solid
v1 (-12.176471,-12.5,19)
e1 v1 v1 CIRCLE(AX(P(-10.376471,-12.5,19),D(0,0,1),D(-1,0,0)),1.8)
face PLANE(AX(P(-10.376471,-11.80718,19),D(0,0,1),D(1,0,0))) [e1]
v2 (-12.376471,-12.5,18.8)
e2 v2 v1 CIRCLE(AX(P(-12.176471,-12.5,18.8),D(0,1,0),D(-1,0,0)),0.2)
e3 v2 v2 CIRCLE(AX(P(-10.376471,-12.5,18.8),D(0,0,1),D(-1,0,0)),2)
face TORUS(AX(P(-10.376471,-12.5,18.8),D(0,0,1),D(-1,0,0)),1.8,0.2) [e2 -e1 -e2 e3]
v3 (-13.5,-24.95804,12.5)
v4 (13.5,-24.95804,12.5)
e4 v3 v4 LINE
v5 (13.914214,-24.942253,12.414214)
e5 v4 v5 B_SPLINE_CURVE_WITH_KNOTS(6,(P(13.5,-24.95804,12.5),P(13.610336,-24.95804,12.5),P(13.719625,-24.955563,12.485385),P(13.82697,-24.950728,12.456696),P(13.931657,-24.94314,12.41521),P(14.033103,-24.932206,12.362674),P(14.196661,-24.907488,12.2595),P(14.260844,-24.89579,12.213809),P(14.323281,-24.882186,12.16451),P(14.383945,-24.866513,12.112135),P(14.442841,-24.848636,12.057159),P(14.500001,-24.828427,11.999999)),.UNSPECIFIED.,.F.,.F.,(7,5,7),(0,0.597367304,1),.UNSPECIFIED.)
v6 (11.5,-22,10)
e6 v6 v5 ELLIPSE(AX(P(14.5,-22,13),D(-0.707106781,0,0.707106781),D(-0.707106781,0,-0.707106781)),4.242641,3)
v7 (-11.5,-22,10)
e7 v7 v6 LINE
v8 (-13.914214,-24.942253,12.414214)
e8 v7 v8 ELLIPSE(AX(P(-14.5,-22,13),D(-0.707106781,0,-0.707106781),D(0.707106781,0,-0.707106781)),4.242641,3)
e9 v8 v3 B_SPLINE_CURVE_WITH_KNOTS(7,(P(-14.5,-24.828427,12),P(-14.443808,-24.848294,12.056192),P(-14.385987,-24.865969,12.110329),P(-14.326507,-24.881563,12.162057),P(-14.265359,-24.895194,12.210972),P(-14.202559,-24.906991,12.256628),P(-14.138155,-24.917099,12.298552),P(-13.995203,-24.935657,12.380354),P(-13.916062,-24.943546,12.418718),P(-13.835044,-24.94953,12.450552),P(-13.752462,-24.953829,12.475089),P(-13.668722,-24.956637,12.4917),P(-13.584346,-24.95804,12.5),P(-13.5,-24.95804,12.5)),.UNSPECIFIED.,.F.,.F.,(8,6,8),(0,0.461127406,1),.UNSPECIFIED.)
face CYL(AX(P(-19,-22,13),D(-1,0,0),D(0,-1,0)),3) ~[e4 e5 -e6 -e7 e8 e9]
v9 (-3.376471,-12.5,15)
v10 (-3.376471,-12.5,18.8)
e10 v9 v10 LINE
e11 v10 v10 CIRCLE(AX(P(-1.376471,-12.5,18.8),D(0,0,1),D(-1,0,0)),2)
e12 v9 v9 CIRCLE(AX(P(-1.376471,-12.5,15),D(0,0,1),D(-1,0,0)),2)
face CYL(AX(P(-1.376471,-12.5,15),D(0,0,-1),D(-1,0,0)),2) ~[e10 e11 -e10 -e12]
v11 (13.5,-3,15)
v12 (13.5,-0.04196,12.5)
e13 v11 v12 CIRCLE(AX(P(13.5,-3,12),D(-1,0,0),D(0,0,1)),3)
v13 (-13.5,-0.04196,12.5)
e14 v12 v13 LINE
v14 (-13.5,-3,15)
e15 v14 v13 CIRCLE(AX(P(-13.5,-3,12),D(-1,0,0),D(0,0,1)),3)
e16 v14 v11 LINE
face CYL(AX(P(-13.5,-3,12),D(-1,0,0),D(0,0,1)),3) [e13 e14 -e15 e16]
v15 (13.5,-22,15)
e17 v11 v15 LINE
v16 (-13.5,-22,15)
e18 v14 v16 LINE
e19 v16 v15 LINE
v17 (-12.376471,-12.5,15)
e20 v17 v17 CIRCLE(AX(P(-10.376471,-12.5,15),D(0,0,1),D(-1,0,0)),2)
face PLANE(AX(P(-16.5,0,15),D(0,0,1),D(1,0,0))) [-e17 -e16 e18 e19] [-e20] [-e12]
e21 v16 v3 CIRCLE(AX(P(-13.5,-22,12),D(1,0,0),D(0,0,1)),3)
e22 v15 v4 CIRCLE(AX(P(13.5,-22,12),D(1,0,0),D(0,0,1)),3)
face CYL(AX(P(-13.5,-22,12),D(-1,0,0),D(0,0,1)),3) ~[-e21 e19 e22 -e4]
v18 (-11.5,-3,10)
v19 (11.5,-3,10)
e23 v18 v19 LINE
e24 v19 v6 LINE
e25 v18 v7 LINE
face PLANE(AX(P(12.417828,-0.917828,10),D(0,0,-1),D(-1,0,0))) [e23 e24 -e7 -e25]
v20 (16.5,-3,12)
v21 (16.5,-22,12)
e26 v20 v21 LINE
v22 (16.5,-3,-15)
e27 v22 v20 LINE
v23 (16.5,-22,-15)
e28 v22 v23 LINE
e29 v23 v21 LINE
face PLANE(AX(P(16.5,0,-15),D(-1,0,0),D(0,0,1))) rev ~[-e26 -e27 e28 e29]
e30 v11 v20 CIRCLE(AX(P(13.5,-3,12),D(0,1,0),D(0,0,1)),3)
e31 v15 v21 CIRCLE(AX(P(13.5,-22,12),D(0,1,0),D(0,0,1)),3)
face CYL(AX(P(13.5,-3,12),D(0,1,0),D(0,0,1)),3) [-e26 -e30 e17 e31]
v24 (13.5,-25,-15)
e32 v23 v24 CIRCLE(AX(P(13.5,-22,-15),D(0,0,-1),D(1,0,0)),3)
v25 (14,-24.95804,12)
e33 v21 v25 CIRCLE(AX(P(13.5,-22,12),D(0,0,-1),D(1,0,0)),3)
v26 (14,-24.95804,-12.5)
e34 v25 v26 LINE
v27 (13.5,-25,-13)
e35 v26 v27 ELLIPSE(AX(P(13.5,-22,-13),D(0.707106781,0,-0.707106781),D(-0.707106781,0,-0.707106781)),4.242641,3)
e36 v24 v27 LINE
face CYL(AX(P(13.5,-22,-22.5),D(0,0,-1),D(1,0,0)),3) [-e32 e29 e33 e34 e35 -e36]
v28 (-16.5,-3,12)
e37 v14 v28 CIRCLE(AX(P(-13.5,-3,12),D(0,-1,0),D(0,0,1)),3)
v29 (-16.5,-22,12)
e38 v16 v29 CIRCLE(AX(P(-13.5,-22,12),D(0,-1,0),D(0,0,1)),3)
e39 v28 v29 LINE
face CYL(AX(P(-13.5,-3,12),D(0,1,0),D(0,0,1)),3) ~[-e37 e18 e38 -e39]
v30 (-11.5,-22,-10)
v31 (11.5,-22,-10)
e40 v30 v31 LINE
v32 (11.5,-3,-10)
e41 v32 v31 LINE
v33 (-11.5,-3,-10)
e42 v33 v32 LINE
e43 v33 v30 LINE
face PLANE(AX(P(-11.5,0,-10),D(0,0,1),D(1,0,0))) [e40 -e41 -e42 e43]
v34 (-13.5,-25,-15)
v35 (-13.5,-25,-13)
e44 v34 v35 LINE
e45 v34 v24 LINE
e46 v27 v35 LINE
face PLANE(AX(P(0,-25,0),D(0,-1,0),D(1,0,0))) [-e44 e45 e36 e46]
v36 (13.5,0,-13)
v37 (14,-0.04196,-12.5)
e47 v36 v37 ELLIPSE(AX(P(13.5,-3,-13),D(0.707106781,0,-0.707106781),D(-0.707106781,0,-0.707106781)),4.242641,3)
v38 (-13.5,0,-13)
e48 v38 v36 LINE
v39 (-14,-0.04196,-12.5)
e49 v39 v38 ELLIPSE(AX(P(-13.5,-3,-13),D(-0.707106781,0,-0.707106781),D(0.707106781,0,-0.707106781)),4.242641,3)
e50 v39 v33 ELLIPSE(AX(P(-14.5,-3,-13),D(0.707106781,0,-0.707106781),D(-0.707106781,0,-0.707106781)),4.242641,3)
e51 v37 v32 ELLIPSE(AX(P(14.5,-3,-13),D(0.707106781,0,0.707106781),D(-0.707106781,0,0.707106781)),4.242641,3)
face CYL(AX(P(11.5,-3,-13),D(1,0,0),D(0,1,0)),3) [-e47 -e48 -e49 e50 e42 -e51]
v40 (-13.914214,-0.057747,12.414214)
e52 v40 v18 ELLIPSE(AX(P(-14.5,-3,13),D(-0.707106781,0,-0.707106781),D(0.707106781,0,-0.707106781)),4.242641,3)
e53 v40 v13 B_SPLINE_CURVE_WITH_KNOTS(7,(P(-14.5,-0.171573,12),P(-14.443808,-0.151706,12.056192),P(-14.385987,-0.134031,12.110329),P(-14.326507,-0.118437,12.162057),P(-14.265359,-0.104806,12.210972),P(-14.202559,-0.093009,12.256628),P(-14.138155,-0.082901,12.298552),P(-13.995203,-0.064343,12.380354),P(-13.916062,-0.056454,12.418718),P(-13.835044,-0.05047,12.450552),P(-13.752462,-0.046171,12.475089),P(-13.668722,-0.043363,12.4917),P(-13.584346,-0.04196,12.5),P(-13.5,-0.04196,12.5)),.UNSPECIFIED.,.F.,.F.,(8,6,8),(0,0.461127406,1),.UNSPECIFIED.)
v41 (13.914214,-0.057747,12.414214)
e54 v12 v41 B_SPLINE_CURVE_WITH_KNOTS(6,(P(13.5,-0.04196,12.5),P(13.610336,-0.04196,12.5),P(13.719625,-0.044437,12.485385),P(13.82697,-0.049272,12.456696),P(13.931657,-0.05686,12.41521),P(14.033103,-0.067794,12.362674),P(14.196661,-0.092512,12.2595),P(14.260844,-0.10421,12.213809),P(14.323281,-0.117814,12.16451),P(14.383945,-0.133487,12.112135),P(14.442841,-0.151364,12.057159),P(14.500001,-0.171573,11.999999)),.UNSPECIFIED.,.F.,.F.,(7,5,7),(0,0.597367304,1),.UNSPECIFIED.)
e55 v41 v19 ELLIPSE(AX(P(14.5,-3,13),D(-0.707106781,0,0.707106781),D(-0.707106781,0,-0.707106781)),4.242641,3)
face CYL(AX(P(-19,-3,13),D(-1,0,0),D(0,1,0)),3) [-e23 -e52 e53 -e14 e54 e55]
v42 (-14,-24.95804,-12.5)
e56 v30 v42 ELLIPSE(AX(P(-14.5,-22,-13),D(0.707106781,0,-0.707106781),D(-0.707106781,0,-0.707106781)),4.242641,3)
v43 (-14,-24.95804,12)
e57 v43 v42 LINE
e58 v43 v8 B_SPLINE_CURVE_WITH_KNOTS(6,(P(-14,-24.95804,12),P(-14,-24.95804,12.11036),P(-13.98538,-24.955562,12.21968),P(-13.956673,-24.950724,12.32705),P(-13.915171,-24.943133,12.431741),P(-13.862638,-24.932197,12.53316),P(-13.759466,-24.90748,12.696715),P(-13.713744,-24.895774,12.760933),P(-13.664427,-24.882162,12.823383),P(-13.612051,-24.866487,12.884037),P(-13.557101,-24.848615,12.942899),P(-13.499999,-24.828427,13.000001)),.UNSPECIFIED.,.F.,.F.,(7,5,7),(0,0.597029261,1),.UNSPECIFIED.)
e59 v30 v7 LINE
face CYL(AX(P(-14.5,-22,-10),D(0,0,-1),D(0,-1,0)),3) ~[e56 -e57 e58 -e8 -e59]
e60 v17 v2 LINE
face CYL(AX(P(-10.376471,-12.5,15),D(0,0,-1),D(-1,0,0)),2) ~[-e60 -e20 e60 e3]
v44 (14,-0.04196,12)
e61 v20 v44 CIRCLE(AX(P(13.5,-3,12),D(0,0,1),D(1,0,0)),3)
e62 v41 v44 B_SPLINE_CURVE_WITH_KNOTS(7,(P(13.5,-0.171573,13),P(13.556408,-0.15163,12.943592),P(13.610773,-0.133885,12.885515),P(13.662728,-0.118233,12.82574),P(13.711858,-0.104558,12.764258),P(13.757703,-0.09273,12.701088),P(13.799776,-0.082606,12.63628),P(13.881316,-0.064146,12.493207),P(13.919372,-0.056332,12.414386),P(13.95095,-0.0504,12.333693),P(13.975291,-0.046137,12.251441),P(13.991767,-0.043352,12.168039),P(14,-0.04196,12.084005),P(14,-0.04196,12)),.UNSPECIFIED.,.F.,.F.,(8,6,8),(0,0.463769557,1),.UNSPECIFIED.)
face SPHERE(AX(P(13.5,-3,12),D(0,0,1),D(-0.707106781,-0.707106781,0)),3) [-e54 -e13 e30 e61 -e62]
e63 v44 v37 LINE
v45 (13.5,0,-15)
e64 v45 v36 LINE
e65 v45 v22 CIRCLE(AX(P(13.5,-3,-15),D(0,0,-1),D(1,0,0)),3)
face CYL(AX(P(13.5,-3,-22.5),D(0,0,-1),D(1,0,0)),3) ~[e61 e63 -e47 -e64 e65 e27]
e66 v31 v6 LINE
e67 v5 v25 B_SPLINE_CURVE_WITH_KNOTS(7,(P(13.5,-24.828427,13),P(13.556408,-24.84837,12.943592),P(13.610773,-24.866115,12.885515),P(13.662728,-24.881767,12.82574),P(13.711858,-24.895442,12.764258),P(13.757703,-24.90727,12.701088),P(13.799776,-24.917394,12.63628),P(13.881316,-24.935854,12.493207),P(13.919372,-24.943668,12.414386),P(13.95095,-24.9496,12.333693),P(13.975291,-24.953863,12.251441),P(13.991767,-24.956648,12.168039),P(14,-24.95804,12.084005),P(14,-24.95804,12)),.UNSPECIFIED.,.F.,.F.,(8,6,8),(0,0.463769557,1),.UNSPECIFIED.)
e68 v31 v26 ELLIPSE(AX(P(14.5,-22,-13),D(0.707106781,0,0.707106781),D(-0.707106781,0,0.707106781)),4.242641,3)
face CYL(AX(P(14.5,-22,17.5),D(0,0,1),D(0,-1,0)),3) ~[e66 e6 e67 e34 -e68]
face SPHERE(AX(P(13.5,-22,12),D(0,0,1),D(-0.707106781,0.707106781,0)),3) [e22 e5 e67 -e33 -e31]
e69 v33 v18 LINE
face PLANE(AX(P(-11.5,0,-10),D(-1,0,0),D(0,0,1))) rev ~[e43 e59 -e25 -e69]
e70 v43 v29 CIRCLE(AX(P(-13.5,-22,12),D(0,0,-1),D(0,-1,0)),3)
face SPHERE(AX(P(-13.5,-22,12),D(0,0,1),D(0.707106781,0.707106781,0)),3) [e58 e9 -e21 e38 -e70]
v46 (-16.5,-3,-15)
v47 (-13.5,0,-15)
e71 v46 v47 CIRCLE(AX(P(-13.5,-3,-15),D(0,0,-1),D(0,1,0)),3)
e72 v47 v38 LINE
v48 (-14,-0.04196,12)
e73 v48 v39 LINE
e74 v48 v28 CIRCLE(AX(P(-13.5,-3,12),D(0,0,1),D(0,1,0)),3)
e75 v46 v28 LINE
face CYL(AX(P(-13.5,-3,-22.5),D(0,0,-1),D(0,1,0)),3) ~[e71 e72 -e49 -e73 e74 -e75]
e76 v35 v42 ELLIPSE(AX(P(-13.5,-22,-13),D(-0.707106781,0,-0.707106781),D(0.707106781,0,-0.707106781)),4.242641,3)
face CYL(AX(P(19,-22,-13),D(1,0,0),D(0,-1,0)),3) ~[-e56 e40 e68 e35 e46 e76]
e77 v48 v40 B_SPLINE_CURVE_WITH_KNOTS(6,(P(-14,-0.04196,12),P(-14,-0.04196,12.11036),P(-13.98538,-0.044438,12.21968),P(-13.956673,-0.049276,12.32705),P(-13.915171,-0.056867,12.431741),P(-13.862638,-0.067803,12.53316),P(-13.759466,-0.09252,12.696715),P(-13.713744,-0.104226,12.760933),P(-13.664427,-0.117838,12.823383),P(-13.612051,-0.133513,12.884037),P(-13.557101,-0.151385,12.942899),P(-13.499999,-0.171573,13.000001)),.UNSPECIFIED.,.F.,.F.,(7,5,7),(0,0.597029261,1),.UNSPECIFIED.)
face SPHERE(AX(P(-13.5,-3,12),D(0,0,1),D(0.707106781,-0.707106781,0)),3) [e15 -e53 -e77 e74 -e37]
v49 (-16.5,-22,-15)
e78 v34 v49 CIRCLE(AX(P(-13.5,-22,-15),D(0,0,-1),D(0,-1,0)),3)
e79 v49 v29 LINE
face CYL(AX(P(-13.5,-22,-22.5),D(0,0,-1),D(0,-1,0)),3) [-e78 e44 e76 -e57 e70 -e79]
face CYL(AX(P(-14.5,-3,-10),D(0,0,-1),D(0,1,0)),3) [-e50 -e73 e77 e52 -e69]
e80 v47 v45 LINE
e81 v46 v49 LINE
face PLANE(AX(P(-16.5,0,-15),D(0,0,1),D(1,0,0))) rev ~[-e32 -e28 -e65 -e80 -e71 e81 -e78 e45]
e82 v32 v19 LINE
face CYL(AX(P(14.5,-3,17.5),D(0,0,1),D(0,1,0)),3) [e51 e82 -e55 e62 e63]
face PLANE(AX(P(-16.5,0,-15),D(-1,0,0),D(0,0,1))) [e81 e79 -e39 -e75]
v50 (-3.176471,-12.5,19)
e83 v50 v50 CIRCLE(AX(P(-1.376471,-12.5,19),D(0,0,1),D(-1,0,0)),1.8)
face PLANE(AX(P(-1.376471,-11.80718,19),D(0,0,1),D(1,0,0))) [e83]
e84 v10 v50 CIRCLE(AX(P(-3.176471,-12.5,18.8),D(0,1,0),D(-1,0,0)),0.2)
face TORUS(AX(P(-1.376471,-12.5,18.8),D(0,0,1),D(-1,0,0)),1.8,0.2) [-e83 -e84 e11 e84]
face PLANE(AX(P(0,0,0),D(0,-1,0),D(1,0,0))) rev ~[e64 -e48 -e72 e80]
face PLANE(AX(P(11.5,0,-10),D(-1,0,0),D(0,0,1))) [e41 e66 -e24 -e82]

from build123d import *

# Parameters (mm, degrees)
F0_W          = 33
F0_H          = 30
F0_W_2        = 23
F0_H_2        = 20
F1_DEPTH      = 25
F3_DEPTH      = 4
F4_R          = 0.2
F5_T1_DEPTH   = 20
F5_T3_DEPTH   = 23
F5_T5_DEPTH   = 27
F5_T7_DEPTH   = 34.5
F5_T9_DEPTH   = 19
F5_S13_W      = 3
F5_S13_H      = 3
F5_T14_DEPTH  = 3
F5_S19_W      = 3
F5_S19_H      = 3
F5_T20_DEPTH  = 3
F5_S25_W      = 3
F5_S25_H      = 3
F5_T26_DEPTH  = 3
F5_S31_W      = 3
F5_S31_H      = 3
F5_T32_DEPTH  = 3
F5_T39_DEPTH  = 27.5
F5_T43_DEPTH  = 30.5
F5_T50_DEPTH  = 27.5
F5_T54_DEPTH  = 30.5
F5_T61_DEPTH  = 30.5
F5_T65_DEPTH  = 27.5
F5_T72_DEPTH  = 27.5
F5_T76_DEPTH  = 30.5
F5_T83_DEPTH  = 27.5
F5_T87_DEPTH  = 30.5
F5_T94_DEPTH  = 27.5
F5_T98_DEPTH  = 30.5
F5_T105_DEPTH = 30.5
F5_T109_DEPTH = 27.5
F5_T116_DEPTH = 27.5
F5_T120_DEPTH = 30.5


# Not quite as in the source:
# - a fillet or chamfer that OpenCascade refuses, or shapes differently, is made with other operations: its cross-section is extruded or revolved along the edge and cut away or added


with BuildPart() as f1:
    # F0 (on Front) → F1 (new body)
    with BuildSketch(Plane.XZ):
        Rectangle(F0_W, F0_H)
        Rectangle(F0_W_2, F0_H_2, mode=Mode.SUBTRACT)
    extrude(amount=F1_DEPTH)

    # F2 (on face) → F3 (join)
    with BuildSketch(Plane.XY.offset(15)):
        with BuildLine():
            Line((-12.3764710948, -12.5), (-8.3764710948, -12.5))
            ThreePointArc((-8.3764710948, -12.5), (-10.3764710948, -10.5), (-12.3764710948, -12.5))
        make_face()
        with BuildLine():
            ThreePointArc((-12.3764710948, -12.5), (-10.3764710948, -14.5), (-8.3764710948, -12.5))
            Line((-8.3764710948, -12.5), (-12.3764710948, -12.5))
        make_face()
        with BuildLine():
            Line((-3.3764710948, -12.5), (0.6235289052, -12.5))
            ThreePointArc((0.6235289052, -12.5), (-1.3764710948, -10.5), (-3.3764710948, -12.5))
        make_face()
        with BuildLine():
            ThreePointArc((-3.3764710948, -12.5), (-1.3764710948, -14.5), (0.6235289052, -12.5))
            Line((0.6235289052, -12.5), (-3.3764710948, -12.5))
        make_face()
    extrude(amount=F3_DEPTH)

    # F4
    f4_edges = [f1.edges().sort_by_distance(p)[0] for p in [
        (-8.376471, -12.5, 19),
        (0.623529, -12.5, 19),
    ]]
    fillet(f4_edges, radius=F4_R)

    # F5: fillet of radius 3 on 16 edges, made by hand

    # F5_s2 → F5_t1 (cut)
    with BuildSketch(Plane.XY.offset(-10)):
        with BuildLine():
            ThreePointArc((-14.5, -25), (-12.3786796564, -24.1213203436), (-11.5, -22))
            Line((-11.5, -22), (-11.5, -25))
            Line((-11.5, -25), (-14.5, -25))
        make_face()
        with BuildLine():
            ThreePointArc((14.5, -25), (12.3786796564, -24.1213203436), (11.5, -22))
            Line((11.5, -22), (11.5, -25))
            Line((11.5, -25), (14.5, -25))
        make_face()
        with BuildLine():
            ThreePointArc((-14.5, 0), (-12.3786796564, -0.8786796564), (-11.5, -3))
            Line((-11.5, -3), (-11.5, 0))
            Line((-11.5, 0), (-14.5, 0))
        make_face()
        with BuildLine():
            ThreePointArc((14.5, 0), (12.3786796564, -0.8786796564), (11.5, -3))
            Line((11.5, -3), (11.5, 0))
            Line((11.5, 0), (14.5, 0))
        make_face()
    extrude(amount=F5_T1_DEPTH, mode=Mode.SUBTRACT)

    # F5_s4 → F5_t3 (cut)
    with BuildSketch(Plane.YZ.offset(-11.5)):
        with BuildLine():
            ThreePointArc((-25, 13), (-24.1213203436, 10.8786796564), (-22, 10))
            Line((-22, 10), (-25, 10))
            Line((-25, 10), (-25, 13))
        make_face()
        with BuildLine():
            ThreePointArc((-25, -13), (-24.1213203436, -10.8786796564), (-22, -10))
            Line((-22, -10), (-25, -10))
            Line((-25, -10), (-25, -13))
        make_face()
        with BuildLine():
            ThreePointArc((0, 13), (-0.8786796564, 10.8786796564), (-3, 10))
            Line((-3, 10), (0, 10))
            Line((0, 10), (0, 13))
        make_face()
        with BuildLine():
            ThreePointArc((0, -13), (-0.8786796564, -10.8786796564), (-3, -10))
            Line((-3, -10), (0, -10))
            Line((0, -10), (0, -13))
        make_face()
    extrude(amount=F5_T3_DEPTH, mode=Mode.SUBTRACT)

    # F5_s6 → F5_t5 (cut)
    with BuildSketch(Plane.YZ.offset(-13.5)):
        with BuildLine():
            ThreePointArc((-3, 15), (-0.8786796564, 14.1213203436), (0, 12))
            Line((0, 12), (0, 15))
            Line((0, 15), (-3, 15))
        make_face()
        with BuildLine():
            ThreePointArc((-22, 15), (-24.1213203436, 14.1213203436), (-25, 12))
            Line((-25, 12), (-25, 15))
            Line((-25, 15), (-22, 15))
        make_face()
    extrude(amount=F5_T5_DEPTH, mode=Mode.SUBTRACT)

    # F5_s8 → F5_t7 (cut)
    with BuildSketch(Plane.XY.offset(-22.5)):
        with BuildLine():
            ThreePointArc((16.5, -3), (15.6213203436, -0.8786796564), (13.5, 0))
            Line((13.5, 0), (16.5, 0))
            Line((16.5, 0), (16.5, -3))
        make_face()
        with BuildLine():
            ThreePointArc((-13.5, 0), (-15.6213203436, -0.8786796564), (-16.5, -3))
            Line((-16.5, -3), (-16.5, 0))
            Line((-16.5, 0), (-13.5, 0))
        make_face()
        with BuildLine():
            ThreePointArc((-13.5, -25), (-15.6213203436, -24.1213203436), (-16.5, -22))
            Line((-16.5, -22), (-16.5, -25))
            Line((-16.5, -25), (-13.5, -25))
        make_face()
        with BuildLine():
            ThreePointArc((16.5, -22), (15.6213203436, -24.1213203436), (13.5, -25))
            Line((13.5, -25), (16.5, -25))
            Line((16.5, -25), (16.5, -22))
        make_face()
    extrude(amount=F5_T7_DEPTH, mode=Mode.SUBTRACT)

    # F5_s10 → F5_t9 (cut)
    with BuildSketch(Plane.XZ.offset(3)):
        with BuildLine():
            ThreePointArc((-13.5, 15), (-15.6213203436, 14.1213203436), (-16.5, 12))
            Line((-16.5, 12), (-16.5, 15))
            Line((-16.5, 15), (-13.5, 15))
        make_face()
        with BuildLine():
            ThreePointArc((13.5, 15), (15.6213203436, 14.1213203436), (16.5, 12))
            Line((16.5, 12), (16.5, 15))
            Line((16.5, 15), (13.5, 15))
        make_face()
    extrude(amount=F5_T9_DEPTH, mode=Mode.SUBTRACT)


with BuildPart() as f5_tool12:
    # F5_s13 → F5_t14 (new body)
    with BuildSketch(Plane.XY.offset(12)):
        with Locations((15, -1.5)):
            Rectangle(F5_S13_W, F5_S13_H)
    extrude(amount=F5_T14_DEPTH)

    # F5_s15 → F5_t16 (revolve, cut)
    with BuildSketch(Plane(origin=(13.5, -3, 12), x_dir=(-0.7071067812, -0.7071067812, 0), z_dir=(-0.7071067812, 0.7071067812, 0))):
        with BuildLine():
            ThreePointArc((0, -3), (3, 0), (0, 3))
            Line((0, 3), (0, -3))
        make_face()
    revolve(axis=Axis((13.5, -3, 12), (0, 0, 1)), mode=Mode.SUBTRACT)


with BuildPart() as f1_1:
    add(f1.part)

    # F5_t11: cut F5_tool12
    add(f5_tool12.part, mode=Mode.SUBTRACT)


with BuildPart() as f5_tool18:
    # F5_s19 → F5_t20 (new body)
    with BuildSketch(Plane.XY.offset(12)):
        with Locations((-15, -1.5)):
            Rectangle(F5_S19_W, F5_S19_H)
    extrude(amount=F5_T20_DEPTH)

    # F5_s21 → F5_t22 (revolve, cut)
    with BuildSketch(Plane(origin=(-13.5, -3, 12), x_dir=(0.7071067812, -0.7071067812, 0), z_dir=(-0.7071067812, -0.7071067812, 0))):
        with BuildLine():
            ThreePointArc((0, -3), (3, 0), (0, 3))
            Line((0, 3), (0, -3))
        make_face()
    revolve(axis=Axis((-13.5, -3, 12), (0, 0, 1)), mode=Mode.SUBTRACT)


with BuildPart() as f1_2:
    add(f1_1.part)

    # F5_t17: cut F5_tool18
    add(f5_tool18.part, mode=Mode.SUBTRACT)


with BuildPart() as f5_tool24:
    # F5_s25 → F5_t26 (new body)
    with BuildSketch(Plane.XY.offset(12)):
        with Locations((-15, -23.5)):
            Rectangle(F5_S25_W, F5_S25_H)
    extrude(amount=F5_T26_DEPTH)

    # F5_s27 → F5_t28 (revolve, cut)
    with BuildSketch(Plane(origin=(-13.5, -22, 12), x_dir=(0.7071067812, 0.7071067812, 0), z_dir=(0.7071067812, -0.7071067812, 0))):
        with BuildLine():
            ThreePointArc((0, -3), (3, 0), (0, 3))
            Line((0, 3), (0, -3))
        make_face()
    revolve(axis=Axis((-13.5, -22, 12), (0, 0, 1)), mode=Mode.SUBTRACT)


with BuildPart() as f1_3:
    add(f1_2.part)

    # F5_t23: cut F5_tool24
    add(f5_tool24.part, mode=Mode.SUBTRACT)


with BuildPart() as f5_tool30:
    # F5_s31 → F5_t32 (new body)
    with BuildSketch(Plane.XY.offset(12)):
        with Locations((15, -23.5)):
            Rectangle(F5_S31_W, F5_S31_H)
    extrude(amount=F5_T32_DEPTH)

    # F5_s33 → F5_t34 (revolve, cut)
    with BuildSketch(Plane(origin=(13.5, -22, 12), x_dir=(-0.7071067812, 0.7071067812, 0), z_dir=(0.7071067812, 0.7071067812, 0))):
        with BuildLine():
            ThreePointArc((0, -3), (3, 0), (0, 3))
            Line((0, 3), (0, -3))
        make_face()
    revolve(axis=Axis((13.5, -22, 12), (0, 0, 1)), mode=Mode.SUBTRACT)


with BuildPart() as f1_4:
    add(f1_3.part)

    # F5_t29: cut F5_tool30
    add(f5_tool30.part, mode=Mode.SUBTRACT)


with BuildPart() as f5_tool37:
    # F5_s38 → F5_t39 (new body)
    with BuildSketch(Plane.XY.offset(-17.5)):
        with BuildLine():
            ThreePointArc((-14.5, -25), (-12.3786796564, -24.1213203436), (-11.5, -22))
            Line((-11.5, -22), (-11.5, -25))
            Line((-11.5, -25), (-14.5, -25))
        make_face()
    extrude(amount=F5_T39_DEPTH)

    split(bisect_by=Plane.XY.offset(-10), keep=Keep.BOTTOM)


with BuildPart() as f5_tool41:
    # F5_s42 → F5_t43 (new body)
    with BuildSketch(Plane.YZ.offset(11.5)):
        with BuildLine():
            ThreePointArc((-25, -13), (-24.1213203436, -10.8786796564), (-22, -10))
            Line((-22, -10), (-25, -10))
            Line((-25, -10), (-25, -13))
        make_face()
    extrude(amount=-F5_T43_DEPTH)

    split(bisect_by=Plane.YZ.offset(-11.5), keep=Keep.BOTTOM)


with BuildPart() as f5_tool37_1:
    add(f5_tool37.part)

    # F5_t45: intersect F5_tool41
    add(f5_tool41.part, mode=Mode.INTERSECT)


with BuildPart() as f1_5:
    add(f1_4.part)

    # F5_t35: cut F5_tool37
    add(f5_tool37_1.part, mode=Mode.SUBTRACT)


with BuildPart() as f5_tool48:
    # F5_s49 → F5_t50 (new body)
    with BuildSketch(Plane.XY.offset(-10)):
        with BuildLine():
            ThreePointArc((-14.5, -25), (-12.3786796564, -24.1213203436), (-11.5, -22))
            Line((-11.5, -22), (-11.5, -25))
            Line((-11.5, -25), (-14.5, -25))
        make_face()
    extrude(amount=F5_T50_DEPTH)

    split(bisect_by=Plane.XY.offset(10), keep=Keep.TOP)


with BuildPart() as f5_tool52:
    # F5_s53 → F5_t54 (new body)
    with BuildSketch(Plane.YZ.offset(-19)):
        with BuildLine():
            ThreePointArc((-25, 13), (-24.1213203436, 10.8786796564), (-22, 10))
            Line((-22, 10), (-25, 10))
            Line((-25, 10), (-25, 13))
        make_face()
    extrude(amount=F5_T54_DEPTH)

    split(bisect_by=Plane.YZ.offset(-11.5), keep=Keep.BOTTOM)


with BuildPart() as f5_tool48_1:
    add(f5_tool48.part)

    # F5_t56: intersect F5_tool52
    add(f5_tool52.part, mode=Mode.INTERSECT)


with BuildPart() as f1_6:
    add(f1_5.part)

    # F5_t46: cut F5_tool48
    add(f5_tool48_1.part, mode=Mode.SUBTRACT)


with BuildPart() as f5_tool59:
    # F5_s60 → F5_t61 (new body)
    with BuildSketch(Plane.YZ.offset(-11.5)):
        with BuildLine():
            ThreePointArc((-25, 13), (-24.1213203436, 10.8786796564), (-22, 10))
            Line((-22, 10), (-25, 10))
            Line((-25, 10), (-25, 13))
        make_face()
    extrude(amount=F5_T61_DEPTH)

    split(bisect_by=Plane.YZ.offset(11.5), keep=Keep.TOP)


with BuildPart() as f5_tool63:
    # F5_s64 → F5_t65 (new body)
    with BuildSketch(Plane.XY.offset(17.5)):
        with BuildLine():
            ThreePointArc((14.5, -25), (12.3786796564, -24.1213203436), (11.5, -22))
            Line((11.5, -22), (11.5, -25))
            Line((11.5, -25), (14.5, -25))
        make_face()
    extrude(amount=-F5_T65_DEPTH)

    split(bisect_by=Plane.XY.offset(10), keep=Keep.TOP)


with BuildPart() as f5_tool59_1:
    add(f5_tool59.part)

    # F5_t67: intersect F5_tool63
    add(f5_tool63.part, mode=Mode.INTERSECT)


with BuildPart() as f1_7:
    add(f1_6.part)

    # F5_t57: cut F5_tool59
    add(f5_tool59_1.part, mode=Mode.SUBTRACT)


with BuildPart() as f5_tool70:
    # F5_s71 → F5_t72 (new body)
    with BuildSketch(Plane.XY.offset(10)):
        with BuildLine():
            ThreePointArc((14.5, -25), (12.3786796564, -24.1213203436), (11.5, -22))
            Line((11.5, -22), (11.5, -25))
            Line((11.5, -25), (14.5, -25))
        make_face()
    extrude(amount=-F5_T72_DEPTH)

    split(bisect_by=Plane.XY.offset(-10), keep=Keep.BOTTOM)


with BuildPart() as f5_tool74:
    # F5_s75 → F5_t76 (new body)
    with BuildSketch(Plane.YZ.offset(19)):
        with BuildLine():
            ThreePointArc((-25, -13), (-24.1213203436, -10.8786796564), (-22, -10))
            Line((-22, -10), (-25, -10))
            Line((-25, -10), (-25, -13))
        make_face()
    extrude(amount=-F5_T76_DEPTH)

    split(bisect_by=Plane.YZ.offset(11.5), keep=Keep.TOP)


with BuildPart() as f5_tool70_1:
    add(f5_tool70.part)

    # F5_t78: intersect F5_tool74
    add(f5_tool74.part, mode=Mode.INTERSECT)


with BuildPart() as f1_8:
    add(f1_7.part)

    # F5_t68: cut F5_tool70
    add(f5_tool70_1.part, mode=Mode.SUBTRACT)


with BuildPart() as f5_tool81:
    # F5_s82 → F5_t83 (new body)
    with BuildSketch(Plane.XY.offset(-17.5)):
        with BuildLine():
            ThreePointArc((-14.5, 0), (-12.3786796564, -0.8786796564), (-11.5, -3))
            Line((-11.5, -3), (-11.5, 0))
            Line((-11.5, 0), (-14.5, 0))
        make_face()
    extrude(amount=F5_T83_DEPTH)

    split(bisect_by=Plane.XY.offset(-10), keep=Keep.BOTTOM)


with BuildPart() as f5_tool85:
    # F5_s86 → F5_t87 (new body)
    with BuildSketch(Plane.YZ.offset(11.5)):
        with BuildLine():
            ThreePointArc((0, -13), (-0.8786796564, -10.8786796564), (-3, -10))
            Line((-3, -10), (0, -10))
            Line((0, -10), (0, -13))
        make_face()
    extrude(amount=-F5_T87_DEPTH)

    split(bisect_by=Plane.YZ.offset(-11.5), keep=Keep.BOTTOM)


with BuildPart() as f5_tool81_1:
    add(f5_tool81.part)

    # F5_t89: intersect F5_tool85
    add(f5_tool85.part, mode=Mode.INTERSECT)


with BuildPart() as f1_9:
    add(f1_8.part)

    # F5_t79: cut F5_tool81
    add(f5_tool81_1.part, mode=Mode.SUBTRACT)


with BuildPart() as f5_tool92:
    # F5_s93 → F5_t94 (new body)
    with BuildSketch(Plane.XY.offset(-10)):
        with BuildLine():
            ThreePointArc((-14.5, 0), (-12.3786796564, -0.8786796564), (-11.5, -3))
            Line((-11.5, -3), (-11.5, 0))
            Line((-11.5, 0), (-14.5, 0))
        make_face()
    extrude(amount=F5_T94_DEPTH)

    split(bisect_by=Plane.XY.offset(10), keep=Keep.TOP)


with BuildPart() as f5_tool96:
    # F5_s97 → F5_t98 (new body)
    with BuildSketch(Plane.YZ.offset(-19)):
        with BuildLine():
            ThreePointArc((0, 13), (-0.8786796564, 10.8786796564), (-3, 10))
            Line((-3, 10), (0, 10))
            Line((0, 10), (0, 13))
        make_face()
    extrude(amount=F5_T98_DEPTH)

    split(bisect_by=Plane.YZ.offset(-11.5), keep=Keep.BOTTOM)


with BuildPart() as f5_tool92_1:
    add(f5_tool92.part)

    # F5_t100: intersect F5_tool96
    add(f5_tool96.part, mode=Mode.INTERSECT)


with BuildPart() as f1_10:
    add(f1_9.part)

    # F5_t90: cut F5_tool92
    add(f5_tool92_1.part, mode=Mode.SUBTRACT)


with BuildPart() as f5_tool103:
    # F5_s104 → F5_t105 (new body)
    with BuildSketch(Plane.YZ.offset(-11.5)):
        with BuildLine():
            ThreePointArc((0, 13), (-0.8786796564, 10.8786796564), (-3, 10))
            Line((-3, 10), (0, 10))
            Line((0, 10), (0, 13))
        make_face()
    extrude(amount=F5_T105_DEPTH)

    split(bisect_by=Plane.YZ.offset(11.5), keep=Keep.TOP)


with BuildPart() as f5_tool107:
    # F5_s108 → F5_t109 (new body)
    with BuildSketch(Plane.XY.offset(17.5)):
        with BuildLine():
            ThreePointArc((14.5, 0), (12.3786796564, -0.8786796564), (11.5, -3))
            Line((11.5, -3), (11.5, 0))
            Line((11.5, 0), (14.5, 0))
        make_face()
    extrude(amount=-F5_T109_DEPTH)

    split(bisect_by=Plane.XY.offset(10), keep=Keep.TOP)


with BuildPart() as f5_tool103_1:
    add(f5_tool103.part)

    # F5_t111: intersect F5_tool107
    add(f5_tool107.part, mode=Mode.INTERSECT)


with BuildPart() as f1_11:
    add(f1_10.part)

    # F5_t101: cut F5_tool103
    add(f5_tool103_1.part, mode=Mode.SUBTRACT)


with BuildPart() as f5_tool114:
    # F5_s115 → F5_t116 (new body)
    with BuildSketch(Plane.XY.offset(10)):
        with BuildLine():
            ThreePointArc((14.5, 0), (12.3786796564, -0.8786796564), (11.5, -3))
            Line((11.5, -3), (11.5, 0))
            Line((11.5, 0), (14.5, 0))
        make_face()
    extrude(amount=-F5_T116_DEPTH)

    split(bisect_by=Plane.XY.offset(-10), keep=Keep.BOTTOM)


with BuildPart() as f5_tool118:
    # F5_s119 → F5_t120 (new body)
    with BuildSketch(Plane.YZ.offset(19)):
        with BuildLine():
            ThreePointArc((0, -13), (-0.8786796564, -10.8786796564), (-3, -10))
            Line((-3, -10), (0, -10))
            Line((0, -10), (0, -13))
        make_face()
    extrude(amount=-F5_T120_DEPTH)

    split(bisect_by=Plane.YZ.offset(11.5), keep=Keep.TOP)


with BuildPart() as f5_tool114_1:
    add(f5_tool114.part)

    # F5_t122: intersect F5_tool118
    add(f5_tool118.part, mode=Mode.INTERSECT)


with BuildPart() as f1_12:
    add(f1_11.part)

    # F5_t112: cut F5_tool114
    add(f5_tool114_1.part, mode=Mode.SUBTRACT)


solid = f1_12.part
